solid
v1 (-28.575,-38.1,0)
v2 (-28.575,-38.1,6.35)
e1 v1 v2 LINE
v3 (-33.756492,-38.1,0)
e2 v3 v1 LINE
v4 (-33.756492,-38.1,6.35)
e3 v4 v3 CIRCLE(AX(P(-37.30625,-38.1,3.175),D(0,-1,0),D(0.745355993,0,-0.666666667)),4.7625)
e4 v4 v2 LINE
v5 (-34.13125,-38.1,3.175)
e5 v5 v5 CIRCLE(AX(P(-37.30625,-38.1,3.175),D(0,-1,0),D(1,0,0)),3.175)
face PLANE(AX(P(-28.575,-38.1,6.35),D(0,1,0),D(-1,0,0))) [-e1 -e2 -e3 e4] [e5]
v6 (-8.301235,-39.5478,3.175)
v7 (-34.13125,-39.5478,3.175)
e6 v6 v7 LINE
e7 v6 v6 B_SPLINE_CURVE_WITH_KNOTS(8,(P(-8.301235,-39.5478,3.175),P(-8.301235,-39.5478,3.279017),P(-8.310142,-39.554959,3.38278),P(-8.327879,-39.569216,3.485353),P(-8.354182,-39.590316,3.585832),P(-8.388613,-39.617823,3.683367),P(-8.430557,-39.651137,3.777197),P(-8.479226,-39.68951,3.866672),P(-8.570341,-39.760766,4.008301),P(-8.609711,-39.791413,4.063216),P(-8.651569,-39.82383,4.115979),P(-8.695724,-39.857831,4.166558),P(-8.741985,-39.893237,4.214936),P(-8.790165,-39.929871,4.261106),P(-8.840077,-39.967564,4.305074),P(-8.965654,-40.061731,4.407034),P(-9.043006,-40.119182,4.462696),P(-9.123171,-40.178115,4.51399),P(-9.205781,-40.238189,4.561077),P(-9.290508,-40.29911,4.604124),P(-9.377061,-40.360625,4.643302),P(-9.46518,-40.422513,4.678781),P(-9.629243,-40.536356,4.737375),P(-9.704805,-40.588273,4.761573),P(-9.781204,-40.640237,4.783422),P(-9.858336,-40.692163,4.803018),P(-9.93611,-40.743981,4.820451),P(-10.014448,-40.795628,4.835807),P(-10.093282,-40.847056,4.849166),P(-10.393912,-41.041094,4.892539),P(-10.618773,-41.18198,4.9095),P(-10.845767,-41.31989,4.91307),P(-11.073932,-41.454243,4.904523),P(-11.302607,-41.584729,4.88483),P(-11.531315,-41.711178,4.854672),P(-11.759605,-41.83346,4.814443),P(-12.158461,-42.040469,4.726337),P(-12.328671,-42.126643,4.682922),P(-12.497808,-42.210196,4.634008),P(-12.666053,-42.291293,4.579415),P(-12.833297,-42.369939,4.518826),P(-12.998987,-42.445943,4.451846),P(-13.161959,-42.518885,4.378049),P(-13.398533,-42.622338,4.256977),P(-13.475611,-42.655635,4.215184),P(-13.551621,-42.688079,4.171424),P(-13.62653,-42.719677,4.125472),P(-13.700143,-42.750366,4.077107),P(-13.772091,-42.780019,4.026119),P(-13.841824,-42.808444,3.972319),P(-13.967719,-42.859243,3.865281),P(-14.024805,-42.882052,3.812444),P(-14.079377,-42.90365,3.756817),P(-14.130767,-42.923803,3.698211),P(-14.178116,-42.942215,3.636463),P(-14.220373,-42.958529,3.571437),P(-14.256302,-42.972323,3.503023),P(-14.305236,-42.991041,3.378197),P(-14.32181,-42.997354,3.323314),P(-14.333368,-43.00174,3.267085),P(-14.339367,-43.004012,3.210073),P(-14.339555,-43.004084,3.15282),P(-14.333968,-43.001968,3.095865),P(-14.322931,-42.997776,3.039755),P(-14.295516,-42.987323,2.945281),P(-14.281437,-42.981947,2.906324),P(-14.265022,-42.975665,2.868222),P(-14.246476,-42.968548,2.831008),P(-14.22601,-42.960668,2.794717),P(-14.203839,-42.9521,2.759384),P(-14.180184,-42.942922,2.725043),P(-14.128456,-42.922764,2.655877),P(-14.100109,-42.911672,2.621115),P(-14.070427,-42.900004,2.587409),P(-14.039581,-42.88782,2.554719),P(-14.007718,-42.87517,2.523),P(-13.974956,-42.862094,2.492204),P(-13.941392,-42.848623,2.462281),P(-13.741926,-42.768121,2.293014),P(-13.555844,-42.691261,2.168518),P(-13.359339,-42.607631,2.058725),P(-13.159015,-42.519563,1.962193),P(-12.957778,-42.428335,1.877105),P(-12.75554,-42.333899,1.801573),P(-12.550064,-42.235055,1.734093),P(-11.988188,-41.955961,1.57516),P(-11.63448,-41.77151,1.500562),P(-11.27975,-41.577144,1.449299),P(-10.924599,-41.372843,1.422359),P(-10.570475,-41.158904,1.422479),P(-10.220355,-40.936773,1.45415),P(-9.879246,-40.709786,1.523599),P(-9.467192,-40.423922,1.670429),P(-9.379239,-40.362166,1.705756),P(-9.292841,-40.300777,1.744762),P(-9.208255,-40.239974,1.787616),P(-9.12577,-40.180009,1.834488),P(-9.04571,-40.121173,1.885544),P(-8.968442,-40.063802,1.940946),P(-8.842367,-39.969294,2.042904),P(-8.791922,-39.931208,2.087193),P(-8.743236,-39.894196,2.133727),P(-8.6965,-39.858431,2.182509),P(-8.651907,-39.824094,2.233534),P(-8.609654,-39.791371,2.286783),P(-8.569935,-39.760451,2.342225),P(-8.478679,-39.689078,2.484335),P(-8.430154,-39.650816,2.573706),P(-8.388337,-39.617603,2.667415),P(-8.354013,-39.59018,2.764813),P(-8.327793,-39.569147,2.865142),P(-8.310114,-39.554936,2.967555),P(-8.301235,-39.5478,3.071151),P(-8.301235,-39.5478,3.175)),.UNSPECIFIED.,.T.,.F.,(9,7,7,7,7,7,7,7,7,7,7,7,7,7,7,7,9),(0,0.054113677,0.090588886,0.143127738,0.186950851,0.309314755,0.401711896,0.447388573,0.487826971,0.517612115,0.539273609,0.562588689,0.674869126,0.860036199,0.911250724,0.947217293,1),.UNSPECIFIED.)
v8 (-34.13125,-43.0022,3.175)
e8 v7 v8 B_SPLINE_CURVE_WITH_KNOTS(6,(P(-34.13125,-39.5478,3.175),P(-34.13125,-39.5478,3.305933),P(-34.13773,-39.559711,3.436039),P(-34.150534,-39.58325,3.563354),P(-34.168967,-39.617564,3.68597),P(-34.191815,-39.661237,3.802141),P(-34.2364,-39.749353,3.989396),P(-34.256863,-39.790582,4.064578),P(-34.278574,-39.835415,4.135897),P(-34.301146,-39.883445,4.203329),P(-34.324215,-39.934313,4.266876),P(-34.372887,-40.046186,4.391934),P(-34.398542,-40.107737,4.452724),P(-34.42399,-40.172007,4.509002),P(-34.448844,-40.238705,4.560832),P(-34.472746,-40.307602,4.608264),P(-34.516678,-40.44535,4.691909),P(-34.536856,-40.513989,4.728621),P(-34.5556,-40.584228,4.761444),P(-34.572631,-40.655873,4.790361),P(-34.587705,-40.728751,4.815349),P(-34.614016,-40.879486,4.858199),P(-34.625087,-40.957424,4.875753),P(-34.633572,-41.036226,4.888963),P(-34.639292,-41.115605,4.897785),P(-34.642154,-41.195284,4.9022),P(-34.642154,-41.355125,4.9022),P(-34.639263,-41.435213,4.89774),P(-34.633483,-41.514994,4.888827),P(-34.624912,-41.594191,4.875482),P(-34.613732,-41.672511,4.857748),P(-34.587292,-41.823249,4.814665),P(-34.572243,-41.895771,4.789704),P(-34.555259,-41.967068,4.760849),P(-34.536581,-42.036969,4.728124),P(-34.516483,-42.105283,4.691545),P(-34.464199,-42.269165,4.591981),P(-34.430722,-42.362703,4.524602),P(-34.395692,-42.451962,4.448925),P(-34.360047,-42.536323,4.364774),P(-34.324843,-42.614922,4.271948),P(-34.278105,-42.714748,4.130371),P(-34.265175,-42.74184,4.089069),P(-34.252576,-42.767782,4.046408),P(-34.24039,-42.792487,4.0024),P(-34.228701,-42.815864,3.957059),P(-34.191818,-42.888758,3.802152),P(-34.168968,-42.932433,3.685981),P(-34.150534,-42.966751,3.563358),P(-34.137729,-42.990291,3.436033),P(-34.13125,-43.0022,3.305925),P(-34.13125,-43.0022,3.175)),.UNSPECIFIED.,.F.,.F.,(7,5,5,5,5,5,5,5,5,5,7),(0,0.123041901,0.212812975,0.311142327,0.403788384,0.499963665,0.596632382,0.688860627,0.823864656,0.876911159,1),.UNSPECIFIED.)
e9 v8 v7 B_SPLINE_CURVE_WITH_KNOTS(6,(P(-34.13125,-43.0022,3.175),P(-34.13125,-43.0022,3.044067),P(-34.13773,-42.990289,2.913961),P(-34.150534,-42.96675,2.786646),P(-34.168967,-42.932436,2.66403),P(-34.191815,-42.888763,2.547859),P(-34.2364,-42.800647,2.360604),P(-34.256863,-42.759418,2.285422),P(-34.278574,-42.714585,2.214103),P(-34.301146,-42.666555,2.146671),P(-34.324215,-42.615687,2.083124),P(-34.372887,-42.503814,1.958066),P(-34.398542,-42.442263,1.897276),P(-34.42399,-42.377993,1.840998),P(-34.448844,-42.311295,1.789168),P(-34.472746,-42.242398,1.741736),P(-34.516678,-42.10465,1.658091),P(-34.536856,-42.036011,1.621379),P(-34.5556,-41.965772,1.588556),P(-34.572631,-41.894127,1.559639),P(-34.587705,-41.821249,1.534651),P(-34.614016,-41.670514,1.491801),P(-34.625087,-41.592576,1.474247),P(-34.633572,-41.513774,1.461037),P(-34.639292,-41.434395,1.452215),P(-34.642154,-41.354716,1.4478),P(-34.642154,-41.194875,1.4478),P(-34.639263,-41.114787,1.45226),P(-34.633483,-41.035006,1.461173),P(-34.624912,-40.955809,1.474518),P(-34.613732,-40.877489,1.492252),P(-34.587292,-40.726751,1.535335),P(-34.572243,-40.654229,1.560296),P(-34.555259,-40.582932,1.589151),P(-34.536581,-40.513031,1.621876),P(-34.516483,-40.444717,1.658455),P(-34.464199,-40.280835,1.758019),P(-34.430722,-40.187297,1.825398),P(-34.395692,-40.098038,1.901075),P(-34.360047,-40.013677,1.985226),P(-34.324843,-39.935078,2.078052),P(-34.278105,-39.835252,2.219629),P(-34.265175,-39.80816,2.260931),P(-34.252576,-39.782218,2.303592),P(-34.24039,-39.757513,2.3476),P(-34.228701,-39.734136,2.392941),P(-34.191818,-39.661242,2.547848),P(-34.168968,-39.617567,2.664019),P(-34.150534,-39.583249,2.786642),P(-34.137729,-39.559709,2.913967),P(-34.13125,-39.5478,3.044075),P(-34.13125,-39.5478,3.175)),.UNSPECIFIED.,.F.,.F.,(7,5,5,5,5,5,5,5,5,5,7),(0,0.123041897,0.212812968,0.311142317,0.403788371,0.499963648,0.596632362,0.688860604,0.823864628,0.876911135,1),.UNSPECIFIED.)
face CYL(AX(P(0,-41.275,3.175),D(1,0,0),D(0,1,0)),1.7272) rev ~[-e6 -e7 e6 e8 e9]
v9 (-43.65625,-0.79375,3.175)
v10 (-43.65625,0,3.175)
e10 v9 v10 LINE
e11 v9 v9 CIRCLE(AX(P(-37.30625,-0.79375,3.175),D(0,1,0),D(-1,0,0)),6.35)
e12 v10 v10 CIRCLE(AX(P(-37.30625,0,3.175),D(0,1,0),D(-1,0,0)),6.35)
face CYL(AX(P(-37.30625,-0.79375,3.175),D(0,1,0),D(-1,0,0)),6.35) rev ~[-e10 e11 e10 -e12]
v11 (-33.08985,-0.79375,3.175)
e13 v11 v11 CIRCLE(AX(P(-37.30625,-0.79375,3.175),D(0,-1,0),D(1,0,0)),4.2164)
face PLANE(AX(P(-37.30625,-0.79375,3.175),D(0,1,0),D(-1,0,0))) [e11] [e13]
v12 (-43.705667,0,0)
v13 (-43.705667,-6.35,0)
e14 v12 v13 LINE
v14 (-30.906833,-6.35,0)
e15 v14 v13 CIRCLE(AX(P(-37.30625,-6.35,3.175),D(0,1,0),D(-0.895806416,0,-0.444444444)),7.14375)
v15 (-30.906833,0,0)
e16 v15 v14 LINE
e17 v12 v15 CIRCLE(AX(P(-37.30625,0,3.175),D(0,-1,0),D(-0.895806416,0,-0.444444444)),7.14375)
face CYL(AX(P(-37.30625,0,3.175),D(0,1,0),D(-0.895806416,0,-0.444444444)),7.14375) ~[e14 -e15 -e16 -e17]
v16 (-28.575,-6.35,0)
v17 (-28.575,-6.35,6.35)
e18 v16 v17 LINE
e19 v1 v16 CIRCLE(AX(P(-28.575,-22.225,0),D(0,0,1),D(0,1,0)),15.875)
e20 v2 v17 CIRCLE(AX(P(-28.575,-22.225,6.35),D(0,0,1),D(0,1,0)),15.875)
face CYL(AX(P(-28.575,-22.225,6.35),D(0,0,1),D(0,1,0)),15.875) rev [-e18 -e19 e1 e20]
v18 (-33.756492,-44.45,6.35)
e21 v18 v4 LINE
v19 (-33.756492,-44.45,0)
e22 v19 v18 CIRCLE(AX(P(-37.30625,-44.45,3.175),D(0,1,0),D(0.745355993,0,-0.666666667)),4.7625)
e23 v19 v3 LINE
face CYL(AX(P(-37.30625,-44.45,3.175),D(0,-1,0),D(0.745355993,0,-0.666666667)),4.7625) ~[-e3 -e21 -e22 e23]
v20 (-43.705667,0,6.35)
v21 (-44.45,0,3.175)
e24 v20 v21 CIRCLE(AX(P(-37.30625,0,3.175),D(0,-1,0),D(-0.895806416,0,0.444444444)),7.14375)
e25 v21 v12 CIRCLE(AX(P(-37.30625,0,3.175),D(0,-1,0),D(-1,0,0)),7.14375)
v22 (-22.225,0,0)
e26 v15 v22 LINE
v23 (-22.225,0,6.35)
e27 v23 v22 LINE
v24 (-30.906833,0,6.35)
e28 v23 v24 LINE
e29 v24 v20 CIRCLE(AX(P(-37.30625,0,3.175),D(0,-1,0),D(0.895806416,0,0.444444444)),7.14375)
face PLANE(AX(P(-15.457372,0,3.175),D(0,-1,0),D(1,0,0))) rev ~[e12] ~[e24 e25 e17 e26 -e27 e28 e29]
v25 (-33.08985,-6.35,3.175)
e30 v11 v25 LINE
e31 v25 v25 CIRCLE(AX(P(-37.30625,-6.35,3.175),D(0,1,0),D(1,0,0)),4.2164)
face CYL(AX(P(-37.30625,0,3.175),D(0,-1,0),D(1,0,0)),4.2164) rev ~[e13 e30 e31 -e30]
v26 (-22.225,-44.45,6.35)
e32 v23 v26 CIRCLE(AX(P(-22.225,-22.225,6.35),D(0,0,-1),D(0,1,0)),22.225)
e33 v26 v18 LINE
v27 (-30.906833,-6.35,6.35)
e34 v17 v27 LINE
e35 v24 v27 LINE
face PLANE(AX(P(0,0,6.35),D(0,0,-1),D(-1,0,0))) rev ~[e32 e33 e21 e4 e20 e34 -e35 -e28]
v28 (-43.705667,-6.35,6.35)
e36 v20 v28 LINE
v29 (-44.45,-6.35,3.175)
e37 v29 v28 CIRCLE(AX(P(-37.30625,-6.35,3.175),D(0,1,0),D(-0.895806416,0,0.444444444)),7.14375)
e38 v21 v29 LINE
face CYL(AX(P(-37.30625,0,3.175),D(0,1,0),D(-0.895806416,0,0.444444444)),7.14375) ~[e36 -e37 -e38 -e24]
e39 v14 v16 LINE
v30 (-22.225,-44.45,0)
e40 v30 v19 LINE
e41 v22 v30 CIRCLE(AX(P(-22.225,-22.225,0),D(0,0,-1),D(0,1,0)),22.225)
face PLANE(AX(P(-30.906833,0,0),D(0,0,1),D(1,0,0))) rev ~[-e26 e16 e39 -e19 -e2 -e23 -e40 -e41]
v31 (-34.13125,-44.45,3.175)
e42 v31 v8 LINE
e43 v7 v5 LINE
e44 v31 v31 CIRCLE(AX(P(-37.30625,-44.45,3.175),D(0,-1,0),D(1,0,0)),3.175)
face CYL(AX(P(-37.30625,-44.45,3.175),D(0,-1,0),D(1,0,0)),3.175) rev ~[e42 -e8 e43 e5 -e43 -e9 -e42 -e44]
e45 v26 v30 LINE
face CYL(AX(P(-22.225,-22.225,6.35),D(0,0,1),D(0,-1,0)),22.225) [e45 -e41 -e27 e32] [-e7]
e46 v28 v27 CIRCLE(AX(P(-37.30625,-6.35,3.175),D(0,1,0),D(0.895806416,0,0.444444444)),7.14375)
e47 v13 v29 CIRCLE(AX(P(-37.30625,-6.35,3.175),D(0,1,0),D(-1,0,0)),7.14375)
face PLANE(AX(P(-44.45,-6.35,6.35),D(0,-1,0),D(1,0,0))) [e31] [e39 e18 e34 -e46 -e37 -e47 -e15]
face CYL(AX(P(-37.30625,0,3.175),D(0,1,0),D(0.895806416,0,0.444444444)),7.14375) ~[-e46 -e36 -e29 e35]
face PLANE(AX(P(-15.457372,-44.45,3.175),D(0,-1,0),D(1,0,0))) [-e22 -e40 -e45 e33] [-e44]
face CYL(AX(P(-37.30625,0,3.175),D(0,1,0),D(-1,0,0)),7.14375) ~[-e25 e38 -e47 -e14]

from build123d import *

# Parameters (mm, degrees)
F1_DEPTH       = 44.45
F3_DEPTH       = 12.7
F5_D           = 8.4328
F5_DEPTH       = 6.35
F5_CBORE_D     = 12.7
F5_CBORE_DEPTH = 0.79375
F5_TIP         = 2.5334687141
F6_R           = 3.175
F7_DEPTH       = 25.4
F8_R           = 1.7272
F9_DEPTH       = 38.1


# Not quite as in the source:
# - a feature names something its author has since deleted; it is built from what else it names


with BuildPart() as f1:
    # F0 (on Front) → F1 (new body)
    with BuildSketch(Plane.XZ):
        with BuildLine():
            Line((-30.9068329123, 0), (0, 0))
            Line((0, 0), (0, 6.35))
            Line((0, 6.35), (-30.9068329123, 6.35))
            ThreePointArc((-30.9068329123, 6.35), (-30.3510720769, 4.8055410516), (-30.1625, 3.175))
            ThreePointArc((-30.1625, 3.175), (-30.3510720769, 1.5444589484), (-30.9068329123, 0))
        make_face()
        with BuildLine():
            ThreePointArc((-43.7056670877, 0), (-37.30625, -3.96875), (-30.9068329123, 0))
            Line((-30.9068329123, 0), (-43.7056670877, 0))
        make_face()
        with BuildLine():
            Line((-43.7056670877, 0), (-30.9068329123, 0))
            ThreePointArc((-30.9068329123, 0), (-30.3510720769, 1.5444589484), (-30.1625, 3.175))
            ThreePointArc((-30.1625, 3.175), (-30.3510720769, 4.8055410516), (-30.9068329123, 6.35))
            Line((-30.9068329123, 6.35), (-43.7056670877, 6.35))
            ThreePointArc((-43.7056670877, 6.35), (-44.2614279231, 4.8055410516), (-44.45, 3.175))
            ThreePointArc((-44.45, 3.175), (-44.2614279231, 1.5444589484), (-43.7056670877, 0))
        make_face()
        with BuildLine():
            Line((-43.7056670877, 6.35), (-30.9068329123, 6.35))
            ThreePointArc((-30.9068329123, 6.35), (-37.30625, 10.31875), (-43.7056670877, 6.35))
        make_face()
    extrude(amount=F1_DEPTH)

    # F2 (on face) → F3 (intersect, symmetric)
    with BuildSketch(Plane.XY.offset(6.35)):
        with BuildLine():
            Line((-22.225, 0), (-44.45, 0))
            Line((-44.45, 0), (-44.45, -6.35))
            Line((-44.45, -6.35), (-28.575, -6.35))
            ThreePointArc((-28.575, -6.35), (-12.7, -22.225), (-28.575, -38.1))
            Line((-28.575, -38.1), (-44.45, -38.1))
            Line((-44.45, -38.1), (-44.45, -44.45))
            Line((-44.45, -44.45), (-22.225, -44.45))
            ThreePointArc((-22.225, -44.45), (0, -22.225), (-22.225, 0))
        make_face()
    extrude(amount=F3_DEPTH, both=True, mode=Mode.INTERSECT)

    # F5
    with Locations(Plane(origin=(0, 0, 0), x_dir=(-1, 0, 0), z_dir=(0, 1, 0))):
        with Locations((37.30625, 3.175)):
            CounterBoreHole(F5_D / 2, F5_CBORE_D / 2, F5_CBORE_DEPTH, depth=F5_DEPTH)
            with Locations((0, 0, -(F5_DEPTH + F5_TIP / 2))):  # 118° drill point
                Cone(0, F5_D / 2, F5_TIP, mode=Mode.SUBTRACT)

    # F6 (on face) → F7 (cut)
    with BuildSketch(Plane.XZ.offset(44.45)):
        with BuildLine():
            ThreePointArc((-33.7564920857, 0), (-42.06875, 3.175), (-33.7564920857, 6.35))
            Line((-33.7564920857, 6.35), (-30.9068329123, 6.35))
            ThreePointArc((-30.9068329123, 6.35), (-44.45, 3.175), (-30.9068329123, 0))
            Line((-30.9068329123, 0), (-33.7564920857, 0))
        make_face()
        with Locations((-37.30625, 3.175)):
            Circle(F6_R)
    extrude(amount=-F7_DEPTH, mode=Mode.SUBTRACT)

    # F8 (on Right) → F9 (cut)
    with BuildSketch(Plane.YZ):
        with Locations((-41.275, 3.175)):
            Circle(F8_R)
    extrude(amount=-F9_DEPTH, mode=Mode.SUBTRACT)


solid = f1.part
